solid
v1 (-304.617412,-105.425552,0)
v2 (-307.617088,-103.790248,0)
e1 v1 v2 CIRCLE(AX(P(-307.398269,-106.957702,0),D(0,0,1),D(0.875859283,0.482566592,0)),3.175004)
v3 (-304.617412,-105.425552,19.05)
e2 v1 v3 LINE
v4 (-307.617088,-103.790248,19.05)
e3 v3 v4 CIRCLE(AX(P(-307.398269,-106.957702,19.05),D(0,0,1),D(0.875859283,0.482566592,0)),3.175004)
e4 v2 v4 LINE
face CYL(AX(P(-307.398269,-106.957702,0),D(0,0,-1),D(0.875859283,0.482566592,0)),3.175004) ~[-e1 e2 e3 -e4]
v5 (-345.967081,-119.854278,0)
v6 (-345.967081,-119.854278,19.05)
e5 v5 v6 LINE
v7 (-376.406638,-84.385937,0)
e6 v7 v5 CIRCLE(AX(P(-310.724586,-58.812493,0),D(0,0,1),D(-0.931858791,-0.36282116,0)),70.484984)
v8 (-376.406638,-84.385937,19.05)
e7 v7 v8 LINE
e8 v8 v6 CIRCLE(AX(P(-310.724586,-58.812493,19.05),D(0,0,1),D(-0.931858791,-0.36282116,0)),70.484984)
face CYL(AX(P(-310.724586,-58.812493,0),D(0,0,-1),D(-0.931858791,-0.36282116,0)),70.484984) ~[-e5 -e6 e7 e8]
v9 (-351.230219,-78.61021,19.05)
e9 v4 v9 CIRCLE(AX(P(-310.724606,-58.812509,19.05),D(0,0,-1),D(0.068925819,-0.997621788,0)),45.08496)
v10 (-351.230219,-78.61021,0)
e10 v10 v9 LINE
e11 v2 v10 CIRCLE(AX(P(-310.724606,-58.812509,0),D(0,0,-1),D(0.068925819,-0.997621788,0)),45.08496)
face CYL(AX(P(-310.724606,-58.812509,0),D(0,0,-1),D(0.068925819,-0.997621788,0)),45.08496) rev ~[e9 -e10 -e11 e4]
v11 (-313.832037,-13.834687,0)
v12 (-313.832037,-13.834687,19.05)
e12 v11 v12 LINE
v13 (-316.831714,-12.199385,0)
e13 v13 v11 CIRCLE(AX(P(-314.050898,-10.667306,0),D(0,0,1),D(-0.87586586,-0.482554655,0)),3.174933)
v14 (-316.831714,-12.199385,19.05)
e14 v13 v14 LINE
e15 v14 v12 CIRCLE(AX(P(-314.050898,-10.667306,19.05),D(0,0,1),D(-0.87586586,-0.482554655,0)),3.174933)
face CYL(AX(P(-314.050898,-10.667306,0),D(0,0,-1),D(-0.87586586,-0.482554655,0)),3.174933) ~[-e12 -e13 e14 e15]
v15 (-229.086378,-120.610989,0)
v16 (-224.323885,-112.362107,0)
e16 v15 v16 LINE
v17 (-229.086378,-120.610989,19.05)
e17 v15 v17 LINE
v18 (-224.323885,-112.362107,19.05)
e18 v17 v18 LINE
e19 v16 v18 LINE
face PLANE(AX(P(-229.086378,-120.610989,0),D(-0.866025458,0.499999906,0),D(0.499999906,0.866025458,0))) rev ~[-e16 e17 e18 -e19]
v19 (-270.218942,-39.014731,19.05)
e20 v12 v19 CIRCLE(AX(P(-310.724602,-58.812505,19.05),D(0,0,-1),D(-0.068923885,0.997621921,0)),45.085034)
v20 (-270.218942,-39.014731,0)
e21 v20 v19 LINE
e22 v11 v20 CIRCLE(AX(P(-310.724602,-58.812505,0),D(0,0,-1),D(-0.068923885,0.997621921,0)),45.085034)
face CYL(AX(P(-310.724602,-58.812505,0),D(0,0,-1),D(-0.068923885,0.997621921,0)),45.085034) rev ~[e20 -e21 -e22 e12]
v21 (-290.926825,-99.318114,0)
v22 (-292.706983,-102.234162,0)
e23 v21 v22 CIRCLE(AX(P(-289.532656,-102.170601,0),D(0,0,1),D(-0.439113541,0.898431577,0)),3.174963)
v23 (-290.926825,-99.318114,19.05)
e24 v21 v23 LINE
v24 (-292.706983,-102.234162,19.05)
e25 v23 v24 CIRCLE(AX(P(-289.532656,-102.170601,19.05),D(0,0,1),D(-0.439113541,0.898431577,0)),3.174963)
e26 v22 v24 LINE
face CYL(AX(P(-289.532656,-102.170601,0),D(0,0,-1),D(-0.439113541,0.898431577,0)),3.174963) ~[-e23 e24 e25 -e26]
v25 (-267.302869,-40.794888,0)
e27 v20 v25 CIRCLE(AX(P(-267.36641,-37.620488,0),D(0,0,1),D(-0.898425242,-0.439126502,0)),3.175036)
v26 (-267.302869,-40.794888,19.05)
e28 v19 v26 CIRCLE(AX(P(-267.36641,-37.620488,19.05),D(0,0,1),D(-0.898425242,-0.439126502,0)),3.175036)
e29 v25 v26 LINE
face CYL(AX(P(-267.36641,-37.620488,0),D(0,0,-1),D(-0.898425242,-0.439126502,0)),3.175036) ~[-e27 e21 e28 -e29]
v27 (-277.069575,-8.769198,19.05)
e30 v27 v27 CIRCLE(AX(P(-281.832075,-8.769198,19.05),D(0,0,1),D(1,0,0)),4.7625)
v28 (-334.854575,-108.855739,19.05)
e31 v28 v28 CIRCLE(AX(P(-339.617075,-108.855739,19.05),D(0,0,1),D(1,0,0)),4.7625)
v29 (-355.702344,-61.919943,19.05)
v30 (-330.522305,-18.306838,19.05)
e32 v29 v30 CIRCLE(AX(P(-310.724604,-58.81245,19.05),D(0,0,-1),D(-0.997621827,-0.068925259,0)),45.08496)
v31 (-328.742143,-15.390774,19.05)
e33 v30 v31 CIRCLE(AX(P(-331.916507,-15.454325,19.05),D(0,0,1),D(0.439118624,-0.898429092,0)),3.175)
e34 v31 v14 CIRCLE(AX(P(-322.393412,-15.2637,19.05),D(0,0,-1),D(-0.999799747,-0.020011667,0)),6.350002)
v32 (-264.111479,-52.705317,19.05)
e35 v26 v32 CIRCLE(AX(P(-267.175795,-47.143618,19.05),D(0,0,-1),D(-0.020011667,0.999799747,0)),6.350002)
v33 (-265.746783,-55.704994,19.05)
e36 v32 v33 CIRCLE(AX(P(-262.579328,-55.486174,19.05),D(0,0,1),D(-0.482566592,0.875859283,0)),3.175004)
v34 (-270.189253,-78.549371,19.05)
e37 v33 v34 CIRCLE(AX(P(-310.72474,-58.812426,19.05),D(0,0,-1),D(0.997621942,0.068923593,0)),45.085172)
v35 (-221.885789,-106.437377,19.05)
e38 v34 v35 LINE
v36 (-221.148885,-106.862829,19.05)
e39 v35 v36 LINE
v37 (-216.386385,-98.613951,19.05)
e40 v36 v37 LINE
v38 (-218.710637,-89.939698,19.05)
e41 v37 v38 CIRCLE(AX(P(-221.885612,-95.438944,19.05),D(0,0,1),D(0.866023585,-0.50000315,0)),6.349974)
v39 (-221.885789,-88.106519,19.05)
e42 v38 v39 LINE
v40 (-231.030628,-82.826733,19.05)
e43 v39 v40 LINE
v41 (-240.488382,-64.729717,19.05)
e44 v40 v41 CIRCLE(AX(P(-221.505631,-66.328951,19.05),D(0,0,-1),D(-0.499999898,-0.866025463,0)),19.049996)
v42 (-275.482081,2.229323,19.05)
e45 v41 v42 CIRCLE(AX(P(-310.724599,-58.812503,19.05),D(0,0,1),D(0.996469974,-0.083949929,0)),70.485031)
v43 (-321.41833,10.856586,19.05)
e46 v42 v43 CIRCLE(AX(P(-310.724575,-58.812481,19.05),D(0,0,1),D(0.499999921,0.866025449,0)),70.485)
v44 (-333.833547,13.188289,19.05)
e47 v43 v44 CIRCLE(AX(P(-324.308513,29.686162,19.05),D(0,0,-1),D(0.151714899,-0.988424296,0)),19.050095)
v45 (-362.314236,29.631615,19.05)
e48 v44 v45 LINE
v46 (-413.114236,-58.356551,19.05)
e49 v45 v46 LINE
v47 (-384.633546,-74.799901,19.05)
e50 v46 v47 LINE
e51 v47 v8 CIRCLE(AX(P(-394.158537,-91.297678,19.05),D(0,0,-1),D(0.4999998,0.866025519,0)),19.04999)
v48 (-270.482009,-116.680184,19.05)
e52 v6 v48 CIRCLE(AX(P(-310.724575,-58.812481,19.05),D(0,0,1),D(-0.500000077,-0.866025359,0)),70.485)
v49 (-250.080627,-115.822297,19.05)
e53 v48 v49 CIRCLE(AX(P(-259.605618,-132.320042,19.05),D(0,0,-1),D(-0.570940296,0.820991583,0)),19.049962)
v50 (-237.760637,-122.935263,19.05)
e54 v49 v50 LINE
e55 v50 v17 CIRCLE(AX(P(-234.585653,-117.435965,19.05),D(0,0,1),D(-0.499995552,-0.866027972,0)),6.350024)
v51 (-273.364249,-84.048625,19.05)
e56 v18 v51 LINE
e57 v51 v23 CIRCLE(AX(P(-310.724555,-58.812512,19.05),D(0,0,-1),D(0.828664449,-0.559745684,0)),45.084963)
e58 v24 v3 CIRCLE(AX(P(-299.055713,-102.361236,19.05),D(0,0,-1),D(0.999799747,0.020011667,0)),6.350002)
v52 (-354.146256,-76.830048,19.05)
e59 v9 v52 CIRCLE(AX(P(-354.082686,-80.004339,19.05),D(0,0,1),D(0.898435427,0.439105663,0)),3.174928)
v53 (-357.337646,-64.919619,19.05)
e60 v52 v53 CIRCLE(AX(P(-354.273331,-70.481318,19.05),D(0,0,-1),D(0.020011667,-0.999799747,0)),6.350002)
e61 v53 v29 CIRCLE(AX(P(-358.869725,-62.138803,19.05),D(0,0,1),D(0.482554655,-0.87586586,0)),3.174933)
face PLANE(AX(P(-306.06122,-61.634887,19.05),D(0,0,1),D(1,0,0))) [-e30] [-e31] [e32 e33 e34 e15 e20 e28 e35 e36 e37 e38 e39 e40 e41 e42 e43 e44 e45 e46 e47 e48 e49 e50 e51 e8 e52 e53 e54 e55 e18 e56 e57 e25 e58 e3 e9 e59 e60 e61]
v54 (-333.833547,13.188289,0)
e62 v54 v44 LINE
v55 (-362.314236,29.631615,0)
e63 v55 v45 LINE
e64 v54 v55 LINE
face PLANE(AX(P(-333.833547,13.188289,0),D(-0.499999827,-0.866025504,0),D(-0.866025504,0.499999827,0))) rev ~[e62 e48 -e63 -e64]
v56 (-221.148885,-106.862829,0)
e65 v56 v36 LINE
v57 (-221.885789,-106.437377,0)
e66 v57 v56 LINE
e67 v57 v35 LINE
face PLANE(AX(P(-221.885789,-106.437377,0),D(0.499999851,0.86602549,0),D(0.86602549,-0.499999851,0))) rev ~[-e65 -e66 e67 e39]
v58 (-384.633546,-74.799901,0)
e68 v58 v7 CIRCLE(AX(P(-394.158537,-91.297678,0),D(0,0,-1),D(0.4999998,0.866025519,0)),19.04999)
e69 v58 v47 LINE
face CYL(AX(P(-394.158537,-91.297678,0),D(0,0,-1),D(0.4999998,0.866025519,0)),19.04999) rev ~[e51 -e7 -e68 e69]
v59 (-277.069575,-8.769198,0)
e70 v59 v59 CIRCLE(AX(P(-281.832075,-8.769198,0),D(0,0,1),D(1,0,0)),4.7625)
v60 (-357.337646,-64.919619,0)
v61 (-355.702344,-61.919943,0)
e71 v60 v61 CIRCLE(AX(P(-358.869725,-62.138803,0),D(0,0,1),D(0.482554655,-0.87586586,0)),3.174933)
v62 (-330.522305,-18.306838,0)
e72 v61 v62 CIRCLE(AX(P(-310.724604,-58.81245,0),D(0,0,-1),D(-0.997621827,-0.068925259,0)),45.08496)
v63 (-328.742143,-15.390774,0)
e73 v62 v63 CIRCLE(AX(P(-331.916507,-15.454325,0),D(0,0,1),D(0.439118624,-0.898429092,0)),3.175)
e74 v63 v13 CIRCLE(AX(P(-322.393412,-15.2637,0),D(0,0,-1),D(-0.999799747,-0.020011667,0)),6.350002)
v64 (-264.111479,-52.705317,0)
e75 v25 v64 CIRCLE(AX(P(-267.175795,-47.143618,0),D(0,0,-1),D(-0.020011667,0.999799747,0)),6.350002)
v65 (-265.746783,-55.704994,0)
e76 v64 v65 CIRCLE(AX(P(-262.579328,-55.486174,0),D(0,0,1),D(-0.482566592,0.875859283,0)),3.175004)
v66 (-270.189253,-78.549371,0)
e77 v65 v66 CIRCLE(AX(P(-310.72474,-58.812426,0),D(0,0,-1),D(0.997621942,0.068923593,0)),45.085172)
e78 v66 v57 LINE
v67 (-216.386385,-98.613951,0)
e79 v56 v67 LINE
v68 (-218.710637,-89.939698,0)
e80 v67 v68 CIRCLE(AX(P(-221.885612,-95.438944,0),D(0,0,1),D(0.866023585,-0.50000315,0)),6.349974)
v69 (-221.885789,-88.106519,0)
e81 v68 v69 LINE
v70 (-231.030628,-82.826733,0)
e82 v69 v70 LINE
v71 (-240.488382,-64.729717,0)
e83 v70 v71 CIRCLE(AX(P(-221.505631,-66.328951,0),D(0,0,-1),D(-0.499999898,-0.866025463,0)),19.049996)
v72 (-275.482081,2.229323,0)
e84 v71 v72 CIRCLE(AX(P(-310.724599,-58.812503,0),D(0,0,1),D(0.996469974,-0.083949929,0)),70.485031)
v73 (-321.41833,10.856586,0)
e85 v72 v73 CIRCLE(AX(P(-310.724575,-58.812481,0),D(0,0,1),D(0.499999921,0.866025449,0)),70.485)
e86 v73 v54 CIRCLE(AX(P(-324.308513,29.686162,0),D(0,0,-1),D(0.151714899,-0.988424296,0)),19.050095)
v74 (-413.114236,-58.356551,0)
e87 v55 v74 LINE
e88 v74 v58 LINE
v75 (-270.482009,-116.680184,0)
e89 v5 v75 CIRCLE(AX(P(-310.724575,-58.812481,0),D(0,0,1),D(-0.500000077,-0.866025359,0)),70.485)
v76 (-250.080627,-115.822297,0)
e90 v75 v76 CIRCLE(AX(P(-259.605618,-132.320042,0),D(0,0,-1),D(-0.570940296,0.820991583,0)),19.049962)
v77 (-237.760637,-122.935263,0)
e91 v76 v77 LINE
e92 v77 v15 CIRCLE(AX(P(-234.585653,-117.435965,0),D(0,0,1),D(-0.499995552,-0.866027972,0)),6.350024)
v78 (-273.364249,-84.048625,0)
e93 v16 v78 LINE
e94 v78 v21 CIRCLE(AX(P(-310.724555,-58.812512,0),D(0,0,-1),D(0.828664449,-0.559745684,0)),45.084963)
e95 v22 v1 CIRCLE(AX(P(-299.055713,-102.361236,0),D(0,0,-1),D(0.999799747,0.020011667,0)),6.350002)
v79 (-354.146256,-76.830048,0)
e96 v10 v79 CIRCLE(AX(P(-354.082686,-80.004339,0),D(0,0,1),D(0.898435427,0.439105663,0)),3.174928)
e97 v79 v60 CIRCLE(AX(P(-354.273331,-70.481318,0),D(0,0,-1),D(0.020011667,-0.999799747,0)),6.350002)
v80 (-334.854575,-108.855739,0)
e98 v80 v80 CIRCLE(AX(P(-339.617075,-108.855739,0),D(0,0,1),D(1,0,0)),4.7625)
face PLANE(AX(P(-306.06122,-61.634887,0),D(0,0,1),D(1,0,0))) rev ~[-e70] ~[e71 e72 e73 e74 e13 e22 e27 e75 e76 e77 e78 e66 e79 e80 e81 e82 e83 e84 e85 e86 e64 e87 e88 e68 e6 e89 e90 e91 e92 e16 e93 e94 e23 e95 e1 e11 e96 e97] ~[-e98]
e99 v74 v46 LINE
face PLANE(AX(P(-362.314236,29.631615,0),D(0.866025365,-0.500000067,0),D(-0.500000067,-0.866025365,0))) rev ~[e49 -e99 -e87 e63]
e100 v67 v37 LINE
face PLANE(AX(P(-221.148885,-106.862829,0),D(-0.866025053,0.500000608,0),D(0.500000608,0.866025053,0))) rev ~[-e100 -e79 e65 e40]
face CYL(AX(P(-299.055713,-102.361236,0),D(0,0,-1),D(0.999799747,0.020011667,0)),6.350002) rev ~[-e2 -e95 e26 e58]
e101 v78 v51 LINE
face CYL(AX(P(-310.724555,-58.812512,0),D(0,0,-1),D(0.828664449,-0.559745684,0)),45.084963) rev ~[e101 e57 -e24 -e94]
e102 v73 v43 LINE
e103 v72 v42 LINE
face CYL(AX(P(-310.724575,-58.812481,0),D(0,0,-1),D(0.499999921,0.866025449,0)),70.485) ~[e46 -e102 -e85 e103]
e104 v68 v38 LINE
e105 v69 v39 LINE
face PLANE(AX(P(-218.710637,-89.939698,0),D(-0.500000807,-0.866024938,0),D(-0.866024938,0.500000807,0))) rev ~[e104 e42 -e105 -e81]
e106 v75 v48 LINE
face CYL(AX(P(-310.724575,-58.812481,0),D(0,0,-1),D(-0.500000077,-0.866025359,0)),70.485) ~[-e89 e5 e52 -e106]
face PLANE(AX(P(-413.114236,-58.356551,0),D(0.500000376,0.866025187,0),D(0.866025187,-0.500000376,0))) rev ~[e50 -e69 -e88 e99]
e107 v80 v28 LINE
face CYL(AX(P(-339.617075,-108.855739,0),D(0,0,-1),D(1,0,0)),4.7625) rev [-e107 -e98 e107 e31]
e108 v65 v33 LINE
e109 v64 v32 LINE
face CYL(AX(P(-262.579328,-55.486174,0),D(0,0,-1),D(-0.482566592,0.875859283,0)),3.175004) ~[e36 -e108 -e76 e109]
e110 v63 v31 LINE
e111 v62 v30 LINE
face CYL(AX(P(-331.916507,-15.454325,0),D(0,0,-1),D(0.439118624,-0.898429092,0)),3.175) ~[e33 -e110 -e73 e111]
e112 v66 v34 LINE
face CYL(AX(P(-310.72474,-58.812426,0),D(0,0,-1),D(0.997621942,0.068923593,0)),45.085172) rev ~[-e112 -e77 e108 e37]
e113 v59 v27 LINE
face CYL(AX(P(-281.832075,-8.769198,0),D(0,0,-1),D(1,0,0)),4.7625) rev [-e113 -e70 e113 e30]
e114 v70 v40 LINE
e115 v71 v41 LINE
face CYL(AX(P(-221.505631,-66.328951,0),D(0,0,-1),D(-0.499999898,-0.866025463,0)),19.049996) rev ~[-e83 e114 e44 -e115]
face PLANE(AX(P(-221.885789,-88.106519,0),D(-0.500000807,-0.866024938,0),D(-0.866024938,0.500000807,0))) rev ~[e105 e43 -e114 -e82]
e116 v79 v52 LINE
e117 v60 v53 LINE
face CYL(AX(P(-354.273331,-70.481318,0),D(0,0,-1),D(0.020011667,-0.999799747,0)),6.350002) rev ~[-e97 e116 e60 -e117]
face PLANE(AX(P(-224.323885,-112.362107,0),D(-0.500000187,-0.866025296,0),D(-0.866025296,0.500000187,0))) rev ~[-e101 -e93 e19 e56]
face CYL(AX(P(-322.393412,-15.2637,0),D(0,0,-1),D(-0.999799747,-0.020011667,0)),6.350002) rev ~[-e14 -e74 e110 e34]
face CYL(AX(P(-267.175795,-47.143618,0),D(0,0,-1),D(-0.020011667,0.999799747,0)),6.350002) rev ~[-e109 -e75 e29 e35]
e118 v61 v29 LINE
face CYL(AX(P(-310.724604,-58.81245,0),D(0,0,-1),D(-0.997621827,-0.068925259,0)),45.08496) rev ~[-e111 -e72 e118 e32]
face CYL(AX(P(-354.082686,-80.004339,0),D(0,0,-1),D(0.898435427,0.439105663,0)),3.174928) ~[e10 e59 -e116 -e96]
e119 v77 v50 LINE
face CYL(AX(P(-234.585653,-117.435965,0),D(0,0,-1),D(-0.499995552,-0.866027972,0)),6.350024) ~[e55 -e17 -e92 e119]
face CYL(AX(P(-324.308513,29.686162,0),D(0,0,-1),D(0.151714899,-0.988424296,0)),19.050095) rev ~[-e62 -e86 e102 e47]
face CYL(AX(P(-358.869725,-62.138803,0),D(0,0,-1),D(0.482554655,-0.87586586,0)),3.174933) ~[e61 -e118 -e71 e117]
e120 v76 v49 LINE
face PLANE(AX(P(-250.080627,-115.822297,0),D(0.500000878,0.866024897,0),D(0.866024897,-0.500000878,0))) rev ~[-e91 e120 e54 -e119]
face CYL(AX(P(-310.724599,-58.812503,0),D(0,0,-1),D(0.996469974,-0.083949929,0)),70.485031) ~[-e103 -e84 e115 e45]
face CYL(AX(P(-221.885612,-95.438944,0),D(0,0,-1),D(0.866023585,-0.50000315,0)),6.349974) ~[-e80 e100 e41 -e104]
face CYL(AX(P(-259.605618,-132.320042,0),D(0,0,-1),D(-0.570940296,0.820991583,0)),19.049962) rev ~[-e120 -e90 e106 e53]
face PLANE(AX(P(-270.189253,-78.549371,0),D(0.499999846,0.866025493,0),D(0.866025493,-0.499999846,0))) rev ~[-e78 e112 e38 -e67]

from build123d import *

# Parameters (mm, degrees)
F0_R     = 4.7625
F1_DEPTH = 19.05


# Not quite as in the source:
# - ends of sketch curves that miss each other by under 0.0002 mm in the source are joined


with BuildPart() as f1:
    # F0 (on Top) → F1 (new body)
    with BuildSketch(Plane.XY):
        with BuildLine():
            Line((-221.8857894, -106.4373771847), (-221.8857894, -88.1065191612))
            Line((-221.8857894, -88.1065191612), (-231.0306276, -82.826733))
            ThreePointArc((-231.0306276, -82.826733), (-238.3890078323, -75.1524401819), (-240.4883816501, -64.7297166236))
            ThreePointArc((-240.4883816501, -64.7297166236), (-248.2560543221, -26.1655958132), (-275.4820809487, 2.2293229893))
            ThreePointArc((-275.4820809487, 2.2293229893), (-297.7142880041, 10.461378966), (-321.4183295937, 10.8565858382))
            ThreePointArc((-321.4183295937, 10.8565858382), (-327.8248357317, 10.9634065797), (-333.8335467811, 13.1882885934))
            Line((-333.8335467811, 13.1882885934), (-362.314236, 29.6316146))
            Line((-362.314236, 29.6316146), (-413.114236, -58.3565508))
            Line((-413.114236, -58.3565508), (-384.6335462, -74.7999012))
            ThreePointArc((-384.6335462, -74.7999012), (-379.7023894379, -78.8911519852), (-376.4066376642, -84.3859370356))
            ThreePointArc((-376.4066376642, -84.3859370356), (-364.2123588019, -104.7166445735), (-345.9670808498, -119.8542782393))
            ThreePointArc((-345.9670808498, -119.8542782393), (-307.7633473097, -129.2352495129), (-270.4820087562, -116.6801838382))
            ThreePointArc((-270.4820087562, -116.6801838382), (-260.4059713642, -113.286900565), (-250.0806270189, -115.8222971934))
            Line((-250.0806270189, -115.8222971934), (-237.760637, -122.9352634))
            ThreePointArc((-237.760637, -122.9352634), (-232.9421342351, -123.569614107), (-229.0863779145, -120.6109894599))
            Line((-229.0863779145, -120.6109894599), (-224.3238846, -112.362107))
            Line((-224.3238846, -112.362107), (-273.3642488, -84.0486254))
            ThreePointArc((-273.3642488, -84.0486254), (-281.1433177605, -92.8360964437), (-290.9268252362, -99.3181139076))
            ThreePointArc((-290.9268252362, -99.3181139076), (-292.2425670349, -100.5162816603), (-292.7069827203, -102.2341617784))
            ThreePointArc((-292.7069827203, -102.2341617784), (-297.4122125633, -108.4948669165), (-304.6174116153, -105.4255515302))
            ThreePointArc((-304.6174116153, -105.4255515302), (-305.8785439427, -104.1700351993), (-307.6170882048, -103.7902477201))
            ThreePointArc((-307.6170882048, -103.7902477201), (-333.2670739258, -97.8572369807), (-351.2302185284, -78.6102104616))
            ThreePointArc((-351.2302185284, -78.6102104616), (-352.4283762603, -77.2944637651), (-354.1462563784, -76.8300480797))
            ThreePointArc((-354.1462563784, -76.8300480797), (-360.4069615165, -72.1248182367), (-357.3376461302, -64.9196191847))
            ThreePointArc((-357.3376461302, -64.9196191847), (-356.0821208015, -63.6584957522), (-355.7023440666, -61.9199427159))
            ThreePointArc((-355.7023440666, -61.9199427159), (-349.7693252458, -36.2699713018), (-330.5223050616, -18.3068376716))
            ThreePointArc((-330.5223050616, -18.3068376716), (-329.2065612709, -17.1086592996), (-328.7421426797, -15.3907744216))
            ThreePointArc((-328.7421426797, -15.3907744216), (-324.0369128367, -9.1300692835), (-316.8317137847, -12.1993846698))
            ThreePointArc((-316.8317137847, -12.1993846698), (-315.5705903522, -13.4549099985), (-313.8320373159, -13.8346867334))
            ThreePointArc((-313.8320373159, -13.8346867334), (-288.1820750251, -19.7677256868), (-270.2189422924, -39.0147306362))
            ThreePointArc((-270.2189422924, -39.0147306362), (-269.0207538996, -40.3304695291), (-267.3028690216, -40.7948881203))
            ThreePointArc((-267.3028690216, -40.7948881203), (-261.0421638835, -45.5001179633), (-264.1114792698, -52.7053170153))
            ThreePointArc((-264.1114792698, -52.7053170153), (-265.3669956007, -53.9664493427), (-265.7467830799, -55.7049936048))
            ThreePointArc((-265.7467830799, -55.7049936048), (-266.4686255378, -67.4187649457), (-270.1892527015, -78.5493711003))
            Line((-270.1892527015, -78.5493711003), (-221.8857894, -106.4373771847))
        make_face()
        with Locations((-339.6170754, -108.8557386)):
            Circle(F0_R, mode=Mode.SUBTRACT)
        with Locations((-281.8320754, -8.7691976)):
            Circle(F0_R, mode=Mode.SUBTRACT)
        with BuildLine():
            Line((-218.710637, -89.9396982), (-221.8857894, -88.1065191612))
            Line((-221.8857894, -88.1065191612), (-221.8857894, -106.4373771847))
            Line((-221.8857894, -106.4373771847), (-221.1488846, -106.8628292))
            Line((-221.1488846, -106.8628292), (-216.3863846, -98.6139506))
            ThreePointArc((-216.3863846, -98.6139506), (-215.7520068495, -93.7954539688), (-218.710637, -89.9396982))
        make_face()
    extrude(amount=F1_DEPTH)


solid = f1.part
